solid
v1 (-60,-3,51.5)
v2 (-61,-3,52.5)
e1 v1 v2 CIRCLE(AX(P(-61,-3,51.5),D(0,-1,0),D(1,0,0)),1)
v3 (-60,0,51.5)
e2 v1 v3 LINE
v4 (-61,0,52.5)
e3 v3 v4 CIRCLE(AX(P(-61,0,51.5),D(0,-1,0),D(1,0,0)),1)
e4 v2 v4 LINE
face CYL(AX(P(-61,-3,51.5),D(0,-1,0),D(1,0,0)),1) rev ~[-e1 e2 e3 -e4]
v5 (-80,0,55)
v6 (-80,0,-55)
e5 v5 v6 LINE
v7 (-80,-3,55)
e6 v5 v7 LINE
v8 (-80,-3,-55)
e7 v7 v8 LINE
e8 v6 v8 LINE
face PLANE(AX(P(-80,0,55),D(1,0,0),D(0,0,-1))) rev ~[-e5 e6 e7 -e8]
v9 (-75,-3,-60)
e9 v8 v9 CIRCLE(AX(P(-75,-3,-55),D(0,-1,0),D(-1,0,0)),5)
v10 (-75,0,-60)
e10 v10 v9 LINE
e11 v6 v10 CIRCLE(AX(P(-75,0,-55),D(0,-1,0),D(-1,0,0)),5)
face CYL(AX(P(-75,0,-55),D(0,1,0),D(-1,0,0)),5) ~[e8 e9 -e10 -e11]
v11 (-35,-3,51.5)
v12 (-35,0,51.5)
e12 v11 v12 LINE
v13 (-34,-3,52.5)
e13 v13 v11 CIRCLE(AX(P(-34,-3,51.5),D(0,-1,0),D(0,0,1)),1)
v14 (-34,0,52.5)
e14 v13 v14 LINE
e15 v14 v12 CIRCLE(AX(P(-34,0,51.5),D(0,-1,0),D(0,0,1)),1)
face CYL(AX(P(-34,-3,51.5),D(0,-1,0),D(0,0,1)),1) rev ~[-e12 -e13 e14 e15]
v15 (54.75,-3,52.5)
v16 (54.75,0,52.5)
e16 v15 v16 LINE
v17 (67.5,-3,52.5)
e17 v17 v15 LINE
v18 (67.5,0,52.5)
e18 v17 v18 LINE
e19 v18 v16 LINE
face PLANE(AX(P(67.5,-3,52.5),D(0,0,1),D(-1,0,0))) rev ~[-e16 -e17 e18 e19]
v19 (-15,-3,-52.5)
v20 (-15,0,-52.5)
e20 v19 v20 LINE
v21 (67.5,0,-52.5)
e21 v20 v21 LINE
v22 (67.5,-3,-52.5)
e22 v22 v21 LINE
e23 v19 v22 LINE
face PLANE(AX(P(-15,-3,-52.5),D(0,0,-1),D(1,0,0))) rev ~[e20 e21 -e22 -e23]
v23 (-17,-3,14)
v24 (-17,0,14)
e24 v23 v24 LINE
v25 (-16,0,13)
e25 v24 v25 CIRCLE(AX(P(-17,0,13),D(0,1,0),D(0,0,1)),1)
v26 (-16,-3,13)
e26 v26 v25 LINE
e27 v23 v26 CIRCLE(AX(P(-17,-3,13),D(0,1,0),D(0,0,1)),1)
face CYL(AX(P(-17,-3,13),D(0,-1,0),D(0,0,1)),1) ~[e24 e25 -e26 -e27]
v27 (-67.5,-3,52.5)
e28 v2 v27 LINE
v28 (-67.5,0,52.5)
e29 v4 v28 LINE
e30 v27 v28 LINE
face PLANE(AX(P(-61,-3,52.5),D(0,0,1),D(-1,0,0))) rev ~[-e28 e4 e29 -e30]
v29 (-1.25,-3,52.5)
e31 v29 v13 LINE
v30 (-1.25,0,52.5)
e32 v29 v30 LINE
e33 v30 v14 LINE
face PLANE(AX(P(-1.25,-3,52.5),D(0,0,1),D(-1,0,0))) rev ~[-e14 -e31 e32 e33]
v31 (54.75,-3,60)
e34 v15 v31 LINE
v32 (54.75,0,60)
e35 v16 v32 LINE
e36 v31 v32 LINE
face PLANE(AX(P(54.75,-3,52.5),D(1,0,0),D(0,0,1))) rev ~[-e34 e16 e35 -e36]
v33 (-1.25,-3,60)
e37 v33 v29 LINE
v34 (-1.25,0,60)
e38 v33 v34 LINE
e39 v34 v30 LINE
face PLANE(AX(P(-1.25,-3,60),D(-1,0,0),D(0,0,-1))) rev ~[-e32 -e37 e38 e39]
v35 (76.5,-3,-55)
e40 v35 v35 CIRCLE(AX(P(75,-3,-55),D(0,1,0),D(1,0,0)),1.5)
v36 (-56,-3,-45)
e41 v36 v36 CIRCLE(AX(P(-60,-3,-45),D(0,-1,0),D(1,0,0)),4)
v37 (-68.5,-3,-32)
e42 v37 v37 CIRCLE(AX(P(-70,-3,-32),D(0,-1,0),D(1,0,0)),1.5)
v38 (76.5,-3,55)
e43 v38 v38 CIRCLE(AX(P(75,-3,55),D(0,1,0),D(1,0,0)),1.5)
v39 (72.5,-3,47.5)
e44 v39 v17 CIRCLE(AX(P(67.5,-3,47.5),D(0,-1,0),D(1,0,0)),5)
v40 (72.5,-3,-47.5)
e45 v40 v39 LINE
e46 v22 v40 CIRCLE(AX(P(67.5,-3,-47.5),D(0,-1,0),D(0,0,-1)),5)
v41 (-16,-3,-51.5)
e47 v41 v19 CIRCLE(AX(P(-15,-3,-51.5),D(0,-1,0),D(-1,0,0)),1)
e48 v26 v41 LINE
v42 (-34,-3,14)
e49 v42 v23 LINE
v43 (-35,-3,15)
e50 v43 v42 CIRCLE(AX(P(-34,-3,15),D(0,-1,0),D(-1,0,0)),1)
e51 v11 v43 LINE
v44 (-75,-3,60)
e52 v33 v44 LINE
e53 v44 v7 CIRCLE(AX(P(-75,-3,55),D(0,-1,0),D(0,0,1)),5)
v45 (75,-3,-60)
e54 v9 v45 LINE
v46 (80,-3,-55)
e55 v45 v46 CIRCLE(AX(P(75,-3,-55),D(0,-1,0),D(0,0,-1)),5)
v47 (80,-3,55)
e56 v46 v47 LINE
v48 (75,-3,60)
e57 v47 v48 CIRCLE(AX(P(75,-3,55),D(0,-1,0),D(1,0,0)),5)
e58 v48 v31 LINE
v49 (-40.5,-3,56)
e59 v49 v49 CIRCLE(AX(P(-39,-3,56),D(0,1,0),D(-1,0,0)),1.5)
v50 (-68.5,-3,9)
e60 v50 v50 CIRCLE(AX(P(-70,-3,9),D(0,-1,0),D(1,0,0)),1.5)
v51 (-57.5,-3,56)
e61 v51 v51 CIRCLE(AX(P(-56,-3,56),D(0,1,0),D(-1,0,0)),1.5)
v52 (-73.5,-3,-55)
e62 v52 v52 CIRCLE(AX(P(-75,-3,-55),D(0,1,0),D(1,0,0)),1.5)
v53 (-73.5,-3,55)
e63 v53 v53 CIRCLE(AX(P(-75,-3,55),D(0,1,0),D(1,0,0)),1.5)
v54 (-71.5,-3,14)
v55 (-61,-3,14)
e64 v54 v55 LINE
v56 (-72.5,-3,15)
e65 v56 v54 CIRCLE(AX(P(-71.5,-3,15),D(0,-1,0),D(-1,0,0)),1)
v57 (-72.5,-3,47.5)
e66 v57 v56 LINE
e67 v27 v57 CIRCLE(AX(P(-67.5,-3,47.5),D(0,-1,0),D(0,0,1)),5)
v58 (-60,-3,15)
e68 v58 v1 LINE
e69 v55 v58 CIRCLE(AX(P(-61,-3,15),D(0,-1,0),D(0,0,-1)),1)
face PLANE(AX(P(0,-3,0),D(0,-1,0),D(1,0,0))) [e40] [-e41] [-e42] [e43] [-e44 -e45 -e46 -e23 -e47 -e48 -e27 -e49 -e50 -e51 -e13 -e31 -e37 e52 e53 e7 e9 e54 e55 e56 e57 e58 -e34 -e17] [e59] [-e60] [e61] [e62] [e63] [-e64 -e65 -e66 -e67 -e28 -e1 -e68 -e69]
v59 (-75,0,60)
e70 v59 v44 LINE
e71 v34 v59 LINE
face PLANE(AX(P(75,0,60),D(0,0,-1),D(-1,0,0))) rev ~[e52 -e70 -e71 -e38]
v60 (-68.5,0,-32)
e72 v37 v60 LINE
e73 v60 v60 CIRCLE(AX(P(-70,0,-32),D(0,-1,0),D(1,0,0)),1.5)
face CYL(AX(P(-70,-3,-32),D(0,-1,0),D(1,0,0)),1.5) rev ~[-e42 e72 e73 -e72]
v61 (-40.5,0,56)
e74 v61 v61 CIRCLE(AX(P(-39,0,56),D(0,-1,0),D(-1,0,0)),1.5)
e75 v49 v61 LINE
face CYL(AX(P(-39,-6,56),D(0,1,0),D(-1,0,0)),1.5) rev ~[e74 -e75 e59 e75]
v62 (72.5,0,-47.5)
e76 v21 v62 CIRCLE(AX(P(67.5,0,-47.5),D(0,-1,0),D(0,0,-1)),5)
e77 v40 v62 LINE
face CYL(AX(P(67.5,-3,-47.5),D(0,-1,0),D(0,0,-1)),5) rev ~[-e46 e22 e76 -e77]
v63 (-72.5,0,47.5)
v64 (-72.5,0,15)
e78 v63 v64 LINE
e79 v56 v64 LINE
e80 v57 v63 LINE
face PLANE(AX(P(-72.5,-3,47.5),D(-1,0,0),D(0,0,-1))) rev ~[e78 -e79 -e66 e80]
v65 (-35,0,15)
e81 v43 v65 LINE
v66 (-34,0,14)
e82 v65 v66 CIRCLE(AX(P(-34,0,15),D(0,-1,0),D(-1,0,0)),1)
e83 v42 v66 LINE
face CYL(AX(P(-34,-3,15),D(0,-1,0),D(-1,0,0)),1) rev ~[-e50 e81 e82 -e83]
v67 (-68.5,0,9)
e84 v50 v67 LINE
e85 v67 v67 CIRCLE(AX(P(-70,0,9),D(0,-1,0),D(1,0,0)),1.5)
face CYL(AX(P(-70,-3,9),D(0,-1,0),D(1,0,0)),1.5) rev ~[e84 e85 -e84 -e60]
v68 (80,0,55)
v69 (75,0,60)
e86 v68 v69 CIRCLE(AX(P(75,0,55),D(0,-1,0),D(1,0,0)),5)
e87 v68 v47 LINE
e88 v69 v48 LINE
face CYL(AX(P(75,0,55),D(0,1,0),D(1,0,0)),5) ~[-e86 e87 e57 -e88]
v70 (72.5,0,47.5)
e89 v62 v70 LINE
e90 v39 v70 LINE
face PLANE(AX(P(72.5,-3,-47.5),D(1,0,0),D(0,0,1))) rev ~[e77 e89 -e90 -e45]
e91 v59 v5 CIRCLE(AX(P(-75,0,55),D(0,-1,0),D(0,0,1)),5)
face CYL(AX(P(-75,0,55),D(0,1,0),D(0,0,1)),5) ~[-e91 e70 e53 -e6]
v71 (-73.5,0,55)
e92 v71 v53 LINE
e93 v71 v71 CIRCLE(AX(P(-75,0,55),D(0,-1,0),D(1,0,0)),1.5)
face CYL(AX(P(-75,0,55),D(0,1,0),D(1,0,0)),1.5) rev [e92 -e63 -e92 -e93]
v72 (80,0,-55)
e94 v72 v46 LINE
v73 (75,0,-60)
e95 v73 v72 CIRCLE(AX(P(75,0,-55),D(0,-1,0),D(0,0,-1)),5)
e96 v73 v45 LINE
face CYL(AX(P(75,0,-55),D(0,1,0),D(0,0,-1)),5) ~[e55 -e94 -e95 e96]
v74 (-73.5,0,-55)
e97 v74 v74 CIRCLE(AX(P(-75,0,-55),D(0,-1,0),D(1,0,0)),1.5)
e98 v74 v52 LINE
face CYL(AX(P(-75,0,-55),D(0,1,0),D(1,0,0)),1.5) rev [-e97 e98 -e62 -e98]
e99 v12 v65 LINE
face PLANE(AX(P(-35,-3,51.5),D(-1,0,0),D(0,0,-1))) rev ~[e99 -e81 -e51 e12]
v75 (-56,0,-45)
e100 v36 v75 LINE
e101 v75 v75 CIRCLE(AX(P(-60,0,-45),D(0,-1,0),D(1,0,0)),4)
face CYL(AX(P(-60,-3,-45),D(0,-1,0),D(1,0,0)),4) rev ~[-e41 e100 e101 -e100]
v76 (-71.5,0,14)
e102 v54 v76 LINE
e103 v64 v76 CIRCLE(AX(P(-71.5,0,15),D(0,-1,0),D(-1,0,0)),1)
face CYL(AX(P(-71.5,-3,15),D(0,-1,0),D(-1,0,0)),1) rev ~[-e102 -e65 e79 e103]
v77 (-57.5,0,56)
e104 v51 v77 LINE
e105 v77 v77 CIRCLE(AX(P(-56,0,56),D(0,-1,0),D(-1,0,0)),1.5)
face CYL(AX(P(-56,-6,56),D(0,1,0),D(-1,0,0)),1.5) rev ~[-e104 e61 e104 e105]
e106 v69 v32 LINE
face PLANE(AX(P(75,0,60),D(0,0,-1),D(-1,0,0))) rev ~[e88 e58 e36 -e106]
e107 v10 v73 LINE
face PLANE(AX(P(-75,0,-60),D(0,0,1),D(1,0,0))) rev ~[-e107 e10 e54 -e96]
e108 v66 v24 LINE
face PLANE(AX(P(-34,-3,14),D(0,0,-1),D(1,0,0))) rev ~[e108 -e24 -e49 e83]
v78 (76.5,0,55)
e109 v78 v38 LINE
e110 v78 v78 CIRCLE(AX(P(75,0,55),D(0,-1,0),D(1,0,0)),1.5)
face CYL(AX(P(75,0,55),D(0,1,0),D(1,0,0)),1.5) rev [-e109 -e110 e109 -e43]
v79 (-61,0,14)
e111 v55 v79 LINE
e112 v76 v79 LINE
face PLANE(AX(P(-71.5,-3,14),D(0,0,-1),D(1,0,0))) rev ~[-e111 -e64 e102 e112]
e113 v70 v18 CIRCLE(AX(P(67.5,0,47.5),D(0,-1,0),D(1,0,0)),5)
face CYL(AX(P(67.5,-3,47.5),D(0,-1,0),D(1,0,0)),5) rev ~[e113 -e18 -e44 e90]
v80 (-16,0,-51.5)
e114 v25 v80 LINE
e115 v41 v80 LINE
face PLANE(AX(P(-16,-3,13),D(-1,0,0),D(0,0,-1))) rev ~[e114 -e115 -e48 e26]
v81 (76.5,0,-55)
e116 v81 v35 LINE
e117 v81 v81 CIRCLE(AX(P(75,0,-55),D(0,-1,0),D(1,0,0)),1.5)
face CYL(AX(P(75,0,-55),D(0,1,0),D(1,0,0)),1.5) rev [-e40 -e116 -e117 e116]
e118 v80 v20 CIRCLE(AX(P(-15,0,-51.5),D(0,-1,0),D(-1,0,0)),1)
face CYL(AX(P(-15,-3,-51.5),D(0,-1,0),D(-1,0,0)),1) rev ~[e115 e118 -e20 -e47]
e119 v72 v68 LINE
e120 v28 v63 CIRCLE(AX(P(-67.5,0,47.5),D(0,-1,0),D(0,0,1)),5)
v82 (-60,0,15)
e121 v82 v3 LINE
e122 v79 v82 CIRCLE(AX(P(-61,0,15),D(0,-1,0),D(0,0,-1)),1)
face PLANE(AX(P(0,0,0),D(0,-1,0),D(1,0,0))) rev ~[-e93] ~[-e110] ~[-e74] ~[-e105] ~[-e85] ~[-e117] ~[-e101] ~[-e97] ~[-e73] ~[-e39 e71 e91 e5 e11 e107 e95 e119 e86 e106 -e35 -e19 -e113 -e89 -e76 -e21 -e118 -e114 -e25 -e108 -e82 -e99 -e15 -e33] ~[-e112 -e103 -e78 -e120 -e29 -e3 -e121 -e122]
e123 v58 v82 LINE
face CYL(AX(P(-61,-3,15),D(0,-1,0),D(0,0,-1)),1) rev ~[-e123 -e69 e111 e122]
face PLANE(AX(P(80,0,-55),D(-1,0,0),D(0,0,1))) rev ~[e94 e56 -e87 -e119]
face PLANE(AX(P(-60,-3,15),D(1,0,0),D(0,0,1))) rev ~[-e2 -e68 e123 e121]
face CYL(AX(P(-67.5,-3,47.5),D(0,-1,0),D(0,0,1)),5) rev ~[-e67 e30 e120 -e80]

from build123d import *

# Parameters (mm, degrees)
F1_DEPTH  = 3
F2_R      = 1.5
F3_DEPTH  = 25
F5_DEPTH  = 3
F7_D      = 3
F7_DEPTH  = 3
F7_TIP    = 0.9012909285
F8_DEPTH  = 3
F9_R      = 1.5
F9_R_2    = 4
F10_DEPTH = 25


# Not quite as in the source:
# - a feature names something its author has since deleted; it is built from what else it names


with BuildPart() as f1:
    # F0 (on Front) → F1 (new body)
    with BuildSketch(Plane.XZ):
        with BuildLine():
            Line((-75, -60), (75, -60))
            ThreePointArc((75, -60), (78.5355339059, -58.5355339059), (80, -55))
            Line((80, -55), (80, 55))
            ThreePointArc((80, 55), (78.5355339059, 58.5355339059), (75, 60))
            Line((75, 60), (-75, 60))
            ThreePointArc((-75, 60), (-78.5355339059, 58.5355339059), (-80, 55))
            Line((-80, 55), (-80, -55))
            ThreePointArc((-80, -55), (-78.5355339059, -58.5355339059), (-75, -60))
        make_face()
    extrude(amount=F1_DEPTH)

    # F2 (on Front) → F3 (cut)
    with BuildSketch(Plane.XZ):
        with Locations((-75, 55)):
            Circle(F2_R)
        with Locations((75, 55)):
            Circle(F2_R)
        with Locations((75, -55)):
            Circle(F2_R)
        with Locations((-75, -55)):
            Circle(F2_R)
    extrude(amount=F3_DEPTH, mode=Mode.SUBTRACT)

    # F4 (on face) → F5 (cut)
    with BuildSketch(Plane.XZ.offset(3)):
        with BuildLine():
            ThreePointArc((72.5, 47.5), (71.0355339059, 51.0355339059), (67.5, 52.5))
            Line((67.5, 52.5), (54.75, 52.5))
            Line((54.75, 52.5), (54.75, 60))
            Line((54.75, 60), (-1.25, 60))
            Line((-1.25, 60), (-1.25, 52.5))
            Line((-1.25, 52.5), (-34, 52.5))
            ThreePointArc((-34, 52.5), (-34.7071067812, 52.2071067812), (-35, 51.5))
            Line((-35, 51.5), (-35, 15))
            ThreePointArc((-35, 15), (-34.7071067812, 14.2928932188), (-34, 14))
            Line((-34, 14), (-17, 14))
            ThreePointArc((-17, 14), (-16.2928932188, 13.7071067812), (-16, 13))
            Line((-16, 13), (-16, -51.5))
            ThreePointArc((-16, -51.5), (-15.7071067812, -52.2071067812), (-15, -52.5))
            Line((-15, -52.5), (67.5, -52.5))
            ThreePointArc((67.5, -52.5), (71.0355339059, -51.0355339059), (72.5, -47.5))
            Line((72.5, -47.5), (72.5, 47.5))
        make_face()
    extrude(amount=-F5_DEPTH, mode=Mode.SUBTRACT)

    # F7
    with Locations(Plane.XZ.offset(3)):
        with Locations((-56, 56), (-39, 56)):
            Hole(F7_D / 2, depth=F7_DEPTH)
            with Locations((0, 0, -(F7_DEPTH + F7_TIP / 2))):  # 118° drill point
                Cone(0, F7_D / 2, F7_TIP, mode=Mode.SUBTRACT)

    # F4 (on face) → F8 (cut)
    with BuildSketch(Plane.XZ.offset(3)):
        with BuildLine():
            ThreePointArc((72.5, 47.5), (71.0355339059, 51.0355339059), (67.5, 52.5))
            Line((67.5, 52.5), (54.75, 52.5))
            Line((54.75, 52.5), (54.75, 60))
            Line((54.75, 60), (-1.25, 60))
            Line((-1.25, 60), (-1.25, 52.5))
            Line((-1.25, 52.5), (-34, 52.5))
            ThreePointArc((-34, 52.5), (-34.7071067812, 52.2071067812), (-35, 51.5))
            Line((-35, 51.5), (-35, 15))
            ThreePointArc((-35, 15), (-34.7071067812, 14.2928932188), (-34, 14))
            Line((-34, 14), (-17, 14))
            ThreePointArc((-17, 14), (-16.2928932188, 13.7071067812), (-16, 13))
            Line((-16, 13), (-16, -51.5))
            ThreePointArc((-16, -51.5), (-15.7071067812, -52.2071067812), (-15, -52.5))
            Line((-15, -52.5), (67.5, -52.5))
            ThreePointArc((67.5, -52.5), (71.0355339059, -51.0355339059), (72.5, -47.5))
            Line((72.5, -47.5), (72.5, 47.5))
        make_face()
        with BuildLine():
            ThreePointArc((-67.5, 52.5), (-71.0355339059, 51.0355339059), (-72.5, 47.5))
            Line((-72.5, 47.5), (-72.5, 15))
            ThreePointArc((-72.5, 15), (-72.2071067812, 14.2928932188), (-71.5, 14))
            Line((-71.5, 14), (-61, 14))
            ThreePointArc((-61, 14), (-60.2928932188, 14.2928932188), (-60, 15))
            Line((-60, 15), (-60, 51.5))
            ThreePointArc((-60, 51.5), (-60.2928932188, 52.2071067812), (-61, 52.5))
            Line((-61, 52.5), (-67.5, 52.5))
        make_face()
    extrude(amount=-F8_DEPTH, mode=Mode.SUBTRACT)

    # F9 (on face) → F10 (cut)
    with BuildSketch(Plane.XZ.offset(3)):
        with Locations((-70, 9)):
            Circle(F9_R)
        with Locations((-60, -45)):
            Circle(F9_R_2)
        with Locations((-70, -32)):
            Circle(F9_R)
    extrude(amount=-F10_DEPTH, mode=Mode.SUBTRACT)


solid = f1.part
